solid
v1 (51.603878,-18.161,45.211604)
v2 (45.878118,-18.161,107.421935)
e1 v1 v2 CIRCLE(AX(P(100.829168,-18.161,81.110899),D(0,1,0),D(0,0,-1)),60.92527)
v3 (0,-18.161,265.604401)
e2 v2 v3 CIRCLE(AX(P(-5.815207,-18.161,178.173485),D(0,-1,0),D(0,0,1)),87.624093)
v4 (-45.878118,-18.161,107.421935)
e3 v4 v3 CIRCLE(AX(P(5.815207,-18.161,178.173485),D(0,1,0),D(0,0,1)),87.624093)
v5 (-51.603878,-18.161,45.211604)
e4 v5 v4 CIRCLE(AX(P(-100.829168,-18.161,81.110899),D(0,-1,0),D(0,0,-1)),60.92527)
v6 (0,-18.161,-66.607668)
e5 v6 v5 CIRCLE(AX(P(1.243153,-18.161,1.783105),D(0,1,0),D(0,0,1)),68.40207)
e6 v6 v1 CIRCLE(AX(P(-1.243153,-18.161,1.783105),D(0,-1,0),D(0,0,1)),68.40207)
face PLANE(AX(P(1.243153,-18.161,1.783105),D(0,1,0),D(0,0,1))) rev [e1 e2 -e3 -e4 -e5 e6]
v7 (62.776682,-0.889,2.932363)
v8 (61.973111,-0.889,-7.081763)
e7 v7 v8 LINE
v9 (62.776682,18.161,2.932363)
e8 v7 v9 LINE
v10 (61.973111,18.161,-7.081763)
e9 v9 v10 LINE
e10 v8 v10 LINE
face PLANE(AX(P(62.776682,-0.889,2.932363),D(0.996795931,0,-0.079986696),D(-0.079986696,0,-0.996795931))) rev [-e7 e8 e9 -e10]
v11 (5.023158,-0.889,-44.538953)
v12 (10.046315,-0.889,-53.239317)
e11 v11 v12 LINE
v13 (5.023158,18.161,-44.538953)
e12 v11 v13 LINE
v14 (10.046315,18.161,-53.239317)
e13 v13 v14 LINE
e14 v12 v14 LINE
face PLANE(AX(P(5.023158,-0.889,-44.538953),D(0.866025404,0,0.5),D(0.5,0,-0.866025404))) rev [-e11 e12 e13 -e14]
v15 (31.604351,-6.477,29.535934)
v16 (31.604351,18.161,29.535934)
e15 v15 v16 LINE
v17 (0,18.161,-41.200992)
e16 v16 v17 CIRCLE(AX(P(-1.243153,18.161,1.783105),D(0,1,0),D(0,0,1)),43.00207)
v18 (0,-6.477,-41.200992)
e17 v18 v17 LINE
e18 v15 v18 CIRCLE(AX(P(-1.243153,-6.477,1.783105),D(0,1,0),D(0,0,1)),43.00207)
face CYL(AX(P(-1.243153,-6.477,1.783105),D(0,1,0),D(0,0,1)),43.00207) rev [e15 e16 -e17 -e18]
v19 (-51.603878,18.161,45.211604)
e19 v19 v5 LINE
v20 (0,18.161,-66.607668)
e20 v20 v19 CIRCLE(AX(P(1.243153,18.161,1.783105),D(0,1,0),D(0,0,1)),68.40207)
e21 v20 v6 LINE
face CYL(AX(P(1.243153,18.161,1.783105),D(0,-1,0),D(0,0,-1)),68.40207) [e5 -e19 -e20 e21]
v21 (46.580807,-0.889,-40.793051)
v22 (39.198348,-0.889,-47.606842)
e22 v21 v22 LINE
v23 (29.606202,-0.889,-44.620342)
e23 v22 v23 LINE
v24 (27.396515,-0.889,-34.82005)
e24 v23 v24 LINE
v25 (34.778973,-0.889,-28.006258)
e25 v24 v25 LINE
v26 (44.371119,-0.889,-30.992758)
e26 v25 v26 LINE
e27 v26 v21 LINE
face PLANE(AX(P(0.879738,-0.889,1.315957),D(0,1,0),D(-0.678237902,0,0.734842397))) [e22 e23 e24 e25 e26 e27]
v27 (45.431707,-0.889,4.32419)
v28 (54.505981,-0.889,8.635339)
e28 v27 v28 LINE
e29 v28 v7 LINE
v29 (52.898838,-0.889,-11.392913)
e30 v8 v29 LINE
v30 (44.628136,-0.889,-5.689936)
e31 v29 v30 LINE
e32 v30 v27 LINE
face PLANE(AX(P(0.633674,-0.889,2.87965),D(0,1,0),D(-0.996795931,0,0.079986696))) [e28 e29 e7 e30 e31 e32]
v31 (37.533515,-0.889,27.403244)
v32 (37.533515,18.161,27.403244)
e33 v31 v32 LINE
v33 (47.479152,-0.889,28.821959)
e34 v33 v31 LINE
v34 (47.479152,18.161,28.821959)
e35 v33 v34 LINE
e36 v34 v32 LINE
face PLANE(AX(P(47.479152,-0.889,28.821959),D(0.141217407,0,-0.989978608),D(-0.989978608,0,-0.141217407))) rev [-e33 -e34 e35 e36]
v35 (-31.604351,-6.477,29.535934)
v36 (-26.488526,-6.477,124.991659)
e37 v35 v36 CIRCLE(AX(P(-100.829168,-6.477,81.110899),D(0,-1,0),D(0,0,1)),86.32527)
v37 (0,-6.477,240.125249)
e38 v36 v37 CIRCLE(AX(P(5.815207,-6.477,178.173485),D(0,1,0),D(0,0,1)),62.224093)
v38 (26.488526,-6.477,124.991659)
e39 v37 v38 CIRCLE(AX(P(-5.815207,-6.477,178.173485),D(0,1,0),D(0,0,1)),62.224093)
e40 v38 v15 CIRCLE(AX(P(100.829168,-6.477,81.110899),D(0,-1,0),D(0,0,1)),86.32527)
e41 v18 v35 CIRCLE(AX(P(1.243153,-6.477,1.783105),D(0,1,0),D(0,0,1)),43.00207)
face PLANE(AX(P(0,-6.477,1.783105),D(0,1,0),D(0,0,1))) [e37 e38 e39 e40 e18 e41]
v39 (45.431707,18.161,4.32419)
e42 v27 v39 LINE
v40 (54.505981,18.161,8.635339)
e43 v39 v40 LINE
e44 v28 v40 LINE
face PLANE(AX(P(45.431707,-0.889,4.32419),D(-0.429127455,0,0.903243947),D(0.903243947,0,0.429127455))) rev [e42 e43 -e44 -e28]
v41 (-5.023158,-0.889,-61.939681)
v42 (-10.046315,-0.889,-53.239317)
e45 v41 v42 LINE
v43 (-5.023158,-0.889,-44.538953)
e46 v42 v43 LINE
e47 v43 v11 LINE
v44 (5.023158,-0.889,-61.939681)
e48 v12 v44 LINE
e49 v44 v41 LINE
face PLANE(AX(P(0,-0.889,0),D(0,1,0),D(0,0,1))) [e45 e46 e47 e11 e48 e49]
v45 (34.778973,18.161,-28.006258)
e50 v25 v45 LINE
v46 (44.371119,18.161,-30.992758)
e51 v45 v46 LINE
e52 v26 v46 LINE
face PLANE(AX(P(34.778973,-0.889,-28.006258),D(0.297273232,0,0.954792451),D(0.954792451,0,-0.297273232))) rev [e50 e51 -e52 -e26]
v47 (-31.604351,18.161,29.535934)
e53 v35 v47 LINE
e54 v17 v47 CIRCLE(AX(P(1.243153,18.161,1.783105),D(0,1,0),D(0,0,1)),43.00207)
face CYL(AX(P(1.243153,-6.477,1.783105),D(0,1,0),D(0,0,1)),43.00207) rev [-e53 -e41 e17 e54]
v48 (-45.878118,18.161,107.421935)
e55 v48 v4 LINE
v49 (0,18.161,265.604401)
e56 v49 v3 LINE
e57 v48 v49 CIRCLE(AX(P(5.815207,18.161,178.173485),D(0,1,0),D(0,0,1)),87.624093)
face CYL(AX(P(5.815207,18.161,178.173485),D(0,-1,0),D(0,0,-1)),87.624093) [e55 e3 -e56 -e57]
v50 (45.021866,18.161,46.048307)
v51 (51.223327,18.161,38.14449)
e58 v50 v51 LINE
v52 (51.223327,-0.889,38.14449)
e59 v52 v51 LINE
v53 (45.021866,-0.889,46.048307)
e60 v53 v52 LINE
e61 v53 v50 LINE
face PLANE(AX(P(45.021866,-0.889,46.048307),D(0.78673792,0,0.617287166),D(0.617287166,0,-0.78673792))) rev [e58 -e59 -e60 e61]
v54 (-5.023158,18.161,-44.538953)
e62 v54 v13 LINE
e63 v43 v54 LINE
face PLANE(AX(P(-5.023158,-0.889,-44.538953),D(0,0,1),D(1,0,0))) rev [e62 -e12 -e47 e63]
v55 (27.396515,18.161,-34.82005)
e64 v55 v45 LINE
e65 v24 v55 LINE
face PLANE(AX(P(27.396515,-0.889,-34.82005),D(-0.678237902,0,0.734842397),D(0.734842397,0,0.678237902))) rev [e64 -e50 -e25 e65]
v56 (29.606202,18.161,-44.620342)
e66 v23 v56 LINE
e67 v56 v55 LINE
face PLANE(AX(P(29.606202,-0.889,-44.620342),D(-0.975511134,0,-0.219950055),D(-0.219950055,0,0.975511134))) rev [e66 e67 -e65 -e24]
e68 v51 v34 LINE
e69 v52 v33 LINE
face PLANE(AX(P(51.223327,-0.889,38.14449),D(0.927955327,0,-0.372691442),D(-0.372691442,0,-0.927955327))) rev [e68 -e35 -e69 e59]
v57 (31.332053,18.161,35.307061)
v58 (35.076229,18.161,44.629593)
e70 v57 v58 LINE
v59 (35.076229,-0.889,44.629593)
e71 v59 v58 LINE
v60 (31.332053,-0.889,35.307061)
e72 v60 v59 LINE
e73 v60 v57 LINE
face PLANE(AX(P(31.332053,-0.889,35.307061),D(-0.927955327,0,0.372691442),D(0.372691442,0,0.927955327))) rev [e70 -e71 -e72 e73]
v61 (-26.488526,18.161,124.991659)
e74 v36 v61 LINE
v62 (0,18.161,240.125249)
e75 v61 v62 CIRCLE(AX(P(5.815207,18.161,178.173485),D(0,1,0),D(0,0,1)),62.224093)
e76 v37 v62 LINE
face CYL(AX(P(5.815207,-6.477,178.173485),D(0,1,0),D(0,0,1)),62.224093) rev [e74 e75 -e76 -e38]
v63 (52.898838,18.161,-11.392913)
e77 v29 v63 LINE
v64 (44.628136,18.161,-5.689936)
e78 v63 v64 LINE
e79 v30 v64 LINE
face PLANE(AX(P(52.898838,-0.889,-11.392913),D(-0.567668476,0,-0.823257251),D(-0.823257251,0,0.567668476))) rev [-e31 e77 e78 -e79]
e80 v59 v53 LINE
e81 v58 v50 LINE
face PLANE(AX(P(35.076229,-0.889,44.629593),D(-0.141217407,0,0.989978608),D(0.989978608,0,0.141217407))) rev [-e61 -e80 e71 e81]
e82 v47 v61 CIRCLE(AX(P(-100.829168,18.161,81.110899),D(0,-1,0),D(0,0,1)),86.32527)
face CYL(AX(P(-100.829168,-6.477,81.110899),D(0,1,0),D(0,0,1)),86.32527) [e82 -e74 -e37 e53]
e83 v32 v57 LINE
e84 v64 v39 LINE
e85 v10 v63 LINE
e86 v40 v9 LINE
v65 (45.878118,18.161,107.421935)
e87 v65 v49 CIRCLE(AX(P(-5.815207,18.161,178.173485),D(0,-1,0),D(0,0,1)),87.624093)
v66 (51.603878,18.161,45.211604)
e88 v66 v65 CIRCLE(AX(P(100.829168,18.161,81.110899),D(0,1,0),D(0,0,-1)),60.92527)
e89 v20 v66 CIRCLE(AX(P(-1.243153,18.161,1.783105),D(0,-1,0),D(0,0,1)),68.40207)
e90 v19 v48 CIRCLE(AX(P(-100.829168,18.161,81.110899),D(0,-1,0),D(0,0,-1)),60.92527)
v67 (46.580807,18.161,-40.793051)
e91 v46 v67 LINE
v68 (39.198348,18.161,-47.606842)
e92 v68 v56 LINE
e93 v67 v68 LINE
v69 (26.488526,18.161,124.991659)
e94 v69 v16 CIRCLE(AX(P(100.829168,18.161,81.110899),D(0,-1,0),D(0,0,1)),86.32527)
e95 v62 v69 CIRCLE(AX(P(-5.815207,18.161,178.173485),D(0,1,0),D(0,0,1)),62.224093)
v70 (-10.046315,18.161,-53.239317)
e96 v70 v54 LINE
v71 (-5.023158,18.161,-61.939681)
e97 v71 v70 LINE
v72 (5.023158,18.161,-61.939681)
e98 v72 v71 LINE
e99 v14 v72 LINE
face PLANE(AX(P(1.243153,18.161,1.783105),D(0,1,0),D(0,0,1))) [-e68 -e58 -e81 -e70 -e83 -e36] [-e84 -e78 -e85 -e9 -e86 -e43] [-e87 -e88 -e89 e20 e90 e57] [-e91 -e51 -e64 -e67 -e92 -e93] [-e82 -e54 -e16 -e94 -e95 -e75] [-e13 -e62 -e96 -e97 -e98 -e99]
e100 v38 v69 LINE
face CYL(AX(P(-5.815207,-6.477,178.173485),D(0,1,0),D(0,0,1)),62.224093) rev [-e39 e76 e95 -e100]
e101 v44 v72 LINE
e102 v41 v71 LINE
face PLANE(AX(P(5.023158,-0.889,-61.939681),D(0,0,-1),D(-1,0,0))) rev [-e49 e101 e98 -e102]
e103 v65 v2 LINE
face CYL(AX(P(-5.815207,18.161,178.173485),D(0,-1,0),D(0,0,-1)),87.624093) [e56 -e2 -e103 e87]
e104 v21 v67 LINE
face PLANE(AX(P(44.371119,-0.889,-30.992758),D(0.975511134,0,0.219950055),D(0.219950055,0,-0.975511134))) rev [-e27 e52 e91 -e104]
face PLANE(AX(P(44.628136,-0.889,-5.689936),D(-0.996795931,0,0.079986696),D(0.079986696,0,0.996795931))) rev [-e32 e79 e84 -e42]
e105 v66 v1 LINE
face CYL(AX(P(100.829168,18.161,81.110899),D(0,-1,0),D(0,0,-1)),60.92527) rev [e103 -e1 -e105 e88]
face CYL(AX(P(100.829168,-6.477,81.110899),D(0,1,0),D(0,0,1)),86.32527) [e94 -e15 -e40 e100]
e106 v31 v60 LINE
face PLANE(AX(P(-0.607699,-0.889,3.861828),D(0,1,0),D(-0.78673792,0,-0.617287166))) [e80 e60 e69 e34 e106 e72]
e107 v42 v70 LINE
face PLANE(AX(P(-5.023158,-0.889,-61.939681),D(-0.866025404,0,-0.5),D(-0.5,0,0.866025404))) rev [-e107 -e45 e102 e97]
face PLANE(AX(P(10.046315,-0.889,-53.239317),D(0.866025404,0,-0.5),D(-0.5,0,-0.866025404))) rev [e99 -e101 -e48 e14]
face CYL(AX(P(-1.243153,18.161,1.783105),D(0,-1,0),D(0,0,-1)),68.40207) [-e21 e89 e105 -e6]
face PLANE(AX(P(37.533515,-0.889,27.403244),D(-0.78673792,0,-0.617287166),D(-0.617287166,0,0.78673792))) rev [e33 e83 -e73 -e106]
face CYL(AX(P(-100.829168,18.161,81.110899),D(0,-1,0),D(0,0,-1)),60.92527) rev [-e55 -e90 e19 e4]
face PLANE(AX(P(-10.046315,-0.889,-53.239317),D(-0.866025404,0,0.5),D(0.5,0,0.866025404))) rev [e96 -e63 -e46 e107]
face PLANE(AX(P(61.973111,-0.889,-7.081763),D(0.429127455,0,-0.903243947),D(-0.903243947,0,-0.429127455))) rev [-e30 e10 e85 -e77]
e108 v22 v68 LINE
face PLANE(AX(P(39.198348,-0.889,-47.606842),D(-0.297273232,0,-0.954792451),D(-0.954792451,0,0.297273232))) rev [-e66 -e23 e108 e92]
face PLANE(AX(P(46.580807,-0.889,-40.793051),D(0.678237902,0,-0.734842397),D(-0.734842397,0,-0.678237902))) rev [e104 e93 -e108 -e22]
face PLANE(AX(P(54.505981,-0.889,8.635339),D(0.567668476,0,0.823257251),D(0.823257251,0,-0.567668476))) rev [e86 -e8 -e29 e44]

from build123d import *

# Parameters (mm, degrees)
BOSS_EXTRUDE1_DEPTH = 18.161
CUT_EXTRUDE1_DEPTH  = 24.638
CUT_EXTRUDE2_DEPTH  = 19.05
CRVPATTERN1_START   = -0.889
CRVPATTERN1_DEPTH   = 19.05


# Read off the part's stored shape, not the designer's step: CrvPattern1
with BuildPart() as part:
    # Sketch1 → Boss-Extrude1 (new, symmetric)
    with BuildSketch(Plane(origin=(0, 0, 0), x_dir=(1, 0, 0), z_dir=(0, 1, 0))):
        with BuildLine():
            Line((0, 66.607667907), (0, -265.604400607))
            ThreePointArc((0, -265.604400607), (-78.340784416, -202.581490406), (-45.87811803, -107.421934899))
            ThreePointArc((-45.87811803, -107.421934899), (-40.160322886, -75.527015006), (-51.603877928, -45.211604003))
            ThreePointArc((-51.603877928, -45.211604003), (-60.864208699, 26.879044906), (0, 66.607667907))
        make_face()
    boss_extrude1 = extrude(amount=BOSS_EXTRUDE1_DEPTH, both=True)

    # Mirror1: Boss-Extrude1 across plane
    add(boss_extrude1.mirror(Plane(origin=(0, 0, 0), x_dir=(0, 0, 1), z_dir=(1, 0, 0))))

    # Sketch2 → Cut-Extrude1 (cut)
    with BuildSketch(Plane(origin=(0, 18.161, 0), x_dir=(1, 0, 0), z_dir=(0, 1, 0))):
        with BuildLine():
            ThreePointArc((0, 41.200992494), (-38.018423714, 15.7584639), (-31.604351091, -29.535933937))
            ThreePointArc((-31.604351091, -29.535933937), (-14.627606963, -76.491037862), (-26.48852554, -124.99165885))
            ThreePointArc((-26.48852554, -124.99165885), (-54.824707805, -192.124773269), (0, -240.125249216))
            ThreePointArc((0, -240.125249216), (54.824707805, -192.124773269), (26.48852554, -124.99165885))
            ThreePointArc((26.48852554, -124.99165885), (14.627606963, -76.491037862), (31.604351091, -29.535933937))
            ThreePointArc((31.604351091, -29.535933937), (38.018423714, 15.7584639), (0, 41.200992494))
        make_face()
    extrude(amount=-CUT_EXTRUDE1_DEPTH, mode=Mode.SUBTRACT)

    # Sketch3 → Cut-Extrude2 (cut)
    with BuildSketch(Plane(origin=(0, 18.161, 0), x_dir=(1, 0, 0), z_dir=(0, 1, 0))):
        Polygon((10.046315092, 53.239317383), (5.023157546, 61.939681467), (-5.023157546, 61.939681467), (-10.046315092, 53.239317383), (-5.023157546, 44.538953299), (5.023157546, 44.538953299), align=None)
    extrude(amount=-CUT_EXTRUDE2_DEPTH, mode=Mode.SUBTRACT)

    # CrvPattern1 outline → CrvPattern1 (cut)
    with BuildSketch(Plane(origin=(0, 0, 0), x_dir=(1, 0, 0), z_dir=(0, 1, 0)).offset(CRVPATTERN1_START)):
        Polygon((37.533514674, -27.403244166), (31.332053305, -35.307061206), (35.076228964, -44.629592813), (45.021865992, -46.048307379), (51.223327362, -38.144490339), (47.479151703, -28.821958732), align=None)
        Polygon((44.628135866, 5.689936437), (45.431707419, -4.32418957), (54.505980714, -8.635339196), (62.776682456, -2.932362814), (61.973110904, 7.081763193), (52.898837609, 11.392912818), align=None)
        Polygon((27.396514919, 34.820049581), (34.77897318, 28.006257908), (44.371118995, 30.992758468), (46.580806549, 40.7930507), (39.198348288, 47.606842373), (29.606202473, 44.620341813), align=None)
    extrude(amount=CRVPATTERN1_DEPTH, mode=Mode.SUBTRACT)


solid = part.part
